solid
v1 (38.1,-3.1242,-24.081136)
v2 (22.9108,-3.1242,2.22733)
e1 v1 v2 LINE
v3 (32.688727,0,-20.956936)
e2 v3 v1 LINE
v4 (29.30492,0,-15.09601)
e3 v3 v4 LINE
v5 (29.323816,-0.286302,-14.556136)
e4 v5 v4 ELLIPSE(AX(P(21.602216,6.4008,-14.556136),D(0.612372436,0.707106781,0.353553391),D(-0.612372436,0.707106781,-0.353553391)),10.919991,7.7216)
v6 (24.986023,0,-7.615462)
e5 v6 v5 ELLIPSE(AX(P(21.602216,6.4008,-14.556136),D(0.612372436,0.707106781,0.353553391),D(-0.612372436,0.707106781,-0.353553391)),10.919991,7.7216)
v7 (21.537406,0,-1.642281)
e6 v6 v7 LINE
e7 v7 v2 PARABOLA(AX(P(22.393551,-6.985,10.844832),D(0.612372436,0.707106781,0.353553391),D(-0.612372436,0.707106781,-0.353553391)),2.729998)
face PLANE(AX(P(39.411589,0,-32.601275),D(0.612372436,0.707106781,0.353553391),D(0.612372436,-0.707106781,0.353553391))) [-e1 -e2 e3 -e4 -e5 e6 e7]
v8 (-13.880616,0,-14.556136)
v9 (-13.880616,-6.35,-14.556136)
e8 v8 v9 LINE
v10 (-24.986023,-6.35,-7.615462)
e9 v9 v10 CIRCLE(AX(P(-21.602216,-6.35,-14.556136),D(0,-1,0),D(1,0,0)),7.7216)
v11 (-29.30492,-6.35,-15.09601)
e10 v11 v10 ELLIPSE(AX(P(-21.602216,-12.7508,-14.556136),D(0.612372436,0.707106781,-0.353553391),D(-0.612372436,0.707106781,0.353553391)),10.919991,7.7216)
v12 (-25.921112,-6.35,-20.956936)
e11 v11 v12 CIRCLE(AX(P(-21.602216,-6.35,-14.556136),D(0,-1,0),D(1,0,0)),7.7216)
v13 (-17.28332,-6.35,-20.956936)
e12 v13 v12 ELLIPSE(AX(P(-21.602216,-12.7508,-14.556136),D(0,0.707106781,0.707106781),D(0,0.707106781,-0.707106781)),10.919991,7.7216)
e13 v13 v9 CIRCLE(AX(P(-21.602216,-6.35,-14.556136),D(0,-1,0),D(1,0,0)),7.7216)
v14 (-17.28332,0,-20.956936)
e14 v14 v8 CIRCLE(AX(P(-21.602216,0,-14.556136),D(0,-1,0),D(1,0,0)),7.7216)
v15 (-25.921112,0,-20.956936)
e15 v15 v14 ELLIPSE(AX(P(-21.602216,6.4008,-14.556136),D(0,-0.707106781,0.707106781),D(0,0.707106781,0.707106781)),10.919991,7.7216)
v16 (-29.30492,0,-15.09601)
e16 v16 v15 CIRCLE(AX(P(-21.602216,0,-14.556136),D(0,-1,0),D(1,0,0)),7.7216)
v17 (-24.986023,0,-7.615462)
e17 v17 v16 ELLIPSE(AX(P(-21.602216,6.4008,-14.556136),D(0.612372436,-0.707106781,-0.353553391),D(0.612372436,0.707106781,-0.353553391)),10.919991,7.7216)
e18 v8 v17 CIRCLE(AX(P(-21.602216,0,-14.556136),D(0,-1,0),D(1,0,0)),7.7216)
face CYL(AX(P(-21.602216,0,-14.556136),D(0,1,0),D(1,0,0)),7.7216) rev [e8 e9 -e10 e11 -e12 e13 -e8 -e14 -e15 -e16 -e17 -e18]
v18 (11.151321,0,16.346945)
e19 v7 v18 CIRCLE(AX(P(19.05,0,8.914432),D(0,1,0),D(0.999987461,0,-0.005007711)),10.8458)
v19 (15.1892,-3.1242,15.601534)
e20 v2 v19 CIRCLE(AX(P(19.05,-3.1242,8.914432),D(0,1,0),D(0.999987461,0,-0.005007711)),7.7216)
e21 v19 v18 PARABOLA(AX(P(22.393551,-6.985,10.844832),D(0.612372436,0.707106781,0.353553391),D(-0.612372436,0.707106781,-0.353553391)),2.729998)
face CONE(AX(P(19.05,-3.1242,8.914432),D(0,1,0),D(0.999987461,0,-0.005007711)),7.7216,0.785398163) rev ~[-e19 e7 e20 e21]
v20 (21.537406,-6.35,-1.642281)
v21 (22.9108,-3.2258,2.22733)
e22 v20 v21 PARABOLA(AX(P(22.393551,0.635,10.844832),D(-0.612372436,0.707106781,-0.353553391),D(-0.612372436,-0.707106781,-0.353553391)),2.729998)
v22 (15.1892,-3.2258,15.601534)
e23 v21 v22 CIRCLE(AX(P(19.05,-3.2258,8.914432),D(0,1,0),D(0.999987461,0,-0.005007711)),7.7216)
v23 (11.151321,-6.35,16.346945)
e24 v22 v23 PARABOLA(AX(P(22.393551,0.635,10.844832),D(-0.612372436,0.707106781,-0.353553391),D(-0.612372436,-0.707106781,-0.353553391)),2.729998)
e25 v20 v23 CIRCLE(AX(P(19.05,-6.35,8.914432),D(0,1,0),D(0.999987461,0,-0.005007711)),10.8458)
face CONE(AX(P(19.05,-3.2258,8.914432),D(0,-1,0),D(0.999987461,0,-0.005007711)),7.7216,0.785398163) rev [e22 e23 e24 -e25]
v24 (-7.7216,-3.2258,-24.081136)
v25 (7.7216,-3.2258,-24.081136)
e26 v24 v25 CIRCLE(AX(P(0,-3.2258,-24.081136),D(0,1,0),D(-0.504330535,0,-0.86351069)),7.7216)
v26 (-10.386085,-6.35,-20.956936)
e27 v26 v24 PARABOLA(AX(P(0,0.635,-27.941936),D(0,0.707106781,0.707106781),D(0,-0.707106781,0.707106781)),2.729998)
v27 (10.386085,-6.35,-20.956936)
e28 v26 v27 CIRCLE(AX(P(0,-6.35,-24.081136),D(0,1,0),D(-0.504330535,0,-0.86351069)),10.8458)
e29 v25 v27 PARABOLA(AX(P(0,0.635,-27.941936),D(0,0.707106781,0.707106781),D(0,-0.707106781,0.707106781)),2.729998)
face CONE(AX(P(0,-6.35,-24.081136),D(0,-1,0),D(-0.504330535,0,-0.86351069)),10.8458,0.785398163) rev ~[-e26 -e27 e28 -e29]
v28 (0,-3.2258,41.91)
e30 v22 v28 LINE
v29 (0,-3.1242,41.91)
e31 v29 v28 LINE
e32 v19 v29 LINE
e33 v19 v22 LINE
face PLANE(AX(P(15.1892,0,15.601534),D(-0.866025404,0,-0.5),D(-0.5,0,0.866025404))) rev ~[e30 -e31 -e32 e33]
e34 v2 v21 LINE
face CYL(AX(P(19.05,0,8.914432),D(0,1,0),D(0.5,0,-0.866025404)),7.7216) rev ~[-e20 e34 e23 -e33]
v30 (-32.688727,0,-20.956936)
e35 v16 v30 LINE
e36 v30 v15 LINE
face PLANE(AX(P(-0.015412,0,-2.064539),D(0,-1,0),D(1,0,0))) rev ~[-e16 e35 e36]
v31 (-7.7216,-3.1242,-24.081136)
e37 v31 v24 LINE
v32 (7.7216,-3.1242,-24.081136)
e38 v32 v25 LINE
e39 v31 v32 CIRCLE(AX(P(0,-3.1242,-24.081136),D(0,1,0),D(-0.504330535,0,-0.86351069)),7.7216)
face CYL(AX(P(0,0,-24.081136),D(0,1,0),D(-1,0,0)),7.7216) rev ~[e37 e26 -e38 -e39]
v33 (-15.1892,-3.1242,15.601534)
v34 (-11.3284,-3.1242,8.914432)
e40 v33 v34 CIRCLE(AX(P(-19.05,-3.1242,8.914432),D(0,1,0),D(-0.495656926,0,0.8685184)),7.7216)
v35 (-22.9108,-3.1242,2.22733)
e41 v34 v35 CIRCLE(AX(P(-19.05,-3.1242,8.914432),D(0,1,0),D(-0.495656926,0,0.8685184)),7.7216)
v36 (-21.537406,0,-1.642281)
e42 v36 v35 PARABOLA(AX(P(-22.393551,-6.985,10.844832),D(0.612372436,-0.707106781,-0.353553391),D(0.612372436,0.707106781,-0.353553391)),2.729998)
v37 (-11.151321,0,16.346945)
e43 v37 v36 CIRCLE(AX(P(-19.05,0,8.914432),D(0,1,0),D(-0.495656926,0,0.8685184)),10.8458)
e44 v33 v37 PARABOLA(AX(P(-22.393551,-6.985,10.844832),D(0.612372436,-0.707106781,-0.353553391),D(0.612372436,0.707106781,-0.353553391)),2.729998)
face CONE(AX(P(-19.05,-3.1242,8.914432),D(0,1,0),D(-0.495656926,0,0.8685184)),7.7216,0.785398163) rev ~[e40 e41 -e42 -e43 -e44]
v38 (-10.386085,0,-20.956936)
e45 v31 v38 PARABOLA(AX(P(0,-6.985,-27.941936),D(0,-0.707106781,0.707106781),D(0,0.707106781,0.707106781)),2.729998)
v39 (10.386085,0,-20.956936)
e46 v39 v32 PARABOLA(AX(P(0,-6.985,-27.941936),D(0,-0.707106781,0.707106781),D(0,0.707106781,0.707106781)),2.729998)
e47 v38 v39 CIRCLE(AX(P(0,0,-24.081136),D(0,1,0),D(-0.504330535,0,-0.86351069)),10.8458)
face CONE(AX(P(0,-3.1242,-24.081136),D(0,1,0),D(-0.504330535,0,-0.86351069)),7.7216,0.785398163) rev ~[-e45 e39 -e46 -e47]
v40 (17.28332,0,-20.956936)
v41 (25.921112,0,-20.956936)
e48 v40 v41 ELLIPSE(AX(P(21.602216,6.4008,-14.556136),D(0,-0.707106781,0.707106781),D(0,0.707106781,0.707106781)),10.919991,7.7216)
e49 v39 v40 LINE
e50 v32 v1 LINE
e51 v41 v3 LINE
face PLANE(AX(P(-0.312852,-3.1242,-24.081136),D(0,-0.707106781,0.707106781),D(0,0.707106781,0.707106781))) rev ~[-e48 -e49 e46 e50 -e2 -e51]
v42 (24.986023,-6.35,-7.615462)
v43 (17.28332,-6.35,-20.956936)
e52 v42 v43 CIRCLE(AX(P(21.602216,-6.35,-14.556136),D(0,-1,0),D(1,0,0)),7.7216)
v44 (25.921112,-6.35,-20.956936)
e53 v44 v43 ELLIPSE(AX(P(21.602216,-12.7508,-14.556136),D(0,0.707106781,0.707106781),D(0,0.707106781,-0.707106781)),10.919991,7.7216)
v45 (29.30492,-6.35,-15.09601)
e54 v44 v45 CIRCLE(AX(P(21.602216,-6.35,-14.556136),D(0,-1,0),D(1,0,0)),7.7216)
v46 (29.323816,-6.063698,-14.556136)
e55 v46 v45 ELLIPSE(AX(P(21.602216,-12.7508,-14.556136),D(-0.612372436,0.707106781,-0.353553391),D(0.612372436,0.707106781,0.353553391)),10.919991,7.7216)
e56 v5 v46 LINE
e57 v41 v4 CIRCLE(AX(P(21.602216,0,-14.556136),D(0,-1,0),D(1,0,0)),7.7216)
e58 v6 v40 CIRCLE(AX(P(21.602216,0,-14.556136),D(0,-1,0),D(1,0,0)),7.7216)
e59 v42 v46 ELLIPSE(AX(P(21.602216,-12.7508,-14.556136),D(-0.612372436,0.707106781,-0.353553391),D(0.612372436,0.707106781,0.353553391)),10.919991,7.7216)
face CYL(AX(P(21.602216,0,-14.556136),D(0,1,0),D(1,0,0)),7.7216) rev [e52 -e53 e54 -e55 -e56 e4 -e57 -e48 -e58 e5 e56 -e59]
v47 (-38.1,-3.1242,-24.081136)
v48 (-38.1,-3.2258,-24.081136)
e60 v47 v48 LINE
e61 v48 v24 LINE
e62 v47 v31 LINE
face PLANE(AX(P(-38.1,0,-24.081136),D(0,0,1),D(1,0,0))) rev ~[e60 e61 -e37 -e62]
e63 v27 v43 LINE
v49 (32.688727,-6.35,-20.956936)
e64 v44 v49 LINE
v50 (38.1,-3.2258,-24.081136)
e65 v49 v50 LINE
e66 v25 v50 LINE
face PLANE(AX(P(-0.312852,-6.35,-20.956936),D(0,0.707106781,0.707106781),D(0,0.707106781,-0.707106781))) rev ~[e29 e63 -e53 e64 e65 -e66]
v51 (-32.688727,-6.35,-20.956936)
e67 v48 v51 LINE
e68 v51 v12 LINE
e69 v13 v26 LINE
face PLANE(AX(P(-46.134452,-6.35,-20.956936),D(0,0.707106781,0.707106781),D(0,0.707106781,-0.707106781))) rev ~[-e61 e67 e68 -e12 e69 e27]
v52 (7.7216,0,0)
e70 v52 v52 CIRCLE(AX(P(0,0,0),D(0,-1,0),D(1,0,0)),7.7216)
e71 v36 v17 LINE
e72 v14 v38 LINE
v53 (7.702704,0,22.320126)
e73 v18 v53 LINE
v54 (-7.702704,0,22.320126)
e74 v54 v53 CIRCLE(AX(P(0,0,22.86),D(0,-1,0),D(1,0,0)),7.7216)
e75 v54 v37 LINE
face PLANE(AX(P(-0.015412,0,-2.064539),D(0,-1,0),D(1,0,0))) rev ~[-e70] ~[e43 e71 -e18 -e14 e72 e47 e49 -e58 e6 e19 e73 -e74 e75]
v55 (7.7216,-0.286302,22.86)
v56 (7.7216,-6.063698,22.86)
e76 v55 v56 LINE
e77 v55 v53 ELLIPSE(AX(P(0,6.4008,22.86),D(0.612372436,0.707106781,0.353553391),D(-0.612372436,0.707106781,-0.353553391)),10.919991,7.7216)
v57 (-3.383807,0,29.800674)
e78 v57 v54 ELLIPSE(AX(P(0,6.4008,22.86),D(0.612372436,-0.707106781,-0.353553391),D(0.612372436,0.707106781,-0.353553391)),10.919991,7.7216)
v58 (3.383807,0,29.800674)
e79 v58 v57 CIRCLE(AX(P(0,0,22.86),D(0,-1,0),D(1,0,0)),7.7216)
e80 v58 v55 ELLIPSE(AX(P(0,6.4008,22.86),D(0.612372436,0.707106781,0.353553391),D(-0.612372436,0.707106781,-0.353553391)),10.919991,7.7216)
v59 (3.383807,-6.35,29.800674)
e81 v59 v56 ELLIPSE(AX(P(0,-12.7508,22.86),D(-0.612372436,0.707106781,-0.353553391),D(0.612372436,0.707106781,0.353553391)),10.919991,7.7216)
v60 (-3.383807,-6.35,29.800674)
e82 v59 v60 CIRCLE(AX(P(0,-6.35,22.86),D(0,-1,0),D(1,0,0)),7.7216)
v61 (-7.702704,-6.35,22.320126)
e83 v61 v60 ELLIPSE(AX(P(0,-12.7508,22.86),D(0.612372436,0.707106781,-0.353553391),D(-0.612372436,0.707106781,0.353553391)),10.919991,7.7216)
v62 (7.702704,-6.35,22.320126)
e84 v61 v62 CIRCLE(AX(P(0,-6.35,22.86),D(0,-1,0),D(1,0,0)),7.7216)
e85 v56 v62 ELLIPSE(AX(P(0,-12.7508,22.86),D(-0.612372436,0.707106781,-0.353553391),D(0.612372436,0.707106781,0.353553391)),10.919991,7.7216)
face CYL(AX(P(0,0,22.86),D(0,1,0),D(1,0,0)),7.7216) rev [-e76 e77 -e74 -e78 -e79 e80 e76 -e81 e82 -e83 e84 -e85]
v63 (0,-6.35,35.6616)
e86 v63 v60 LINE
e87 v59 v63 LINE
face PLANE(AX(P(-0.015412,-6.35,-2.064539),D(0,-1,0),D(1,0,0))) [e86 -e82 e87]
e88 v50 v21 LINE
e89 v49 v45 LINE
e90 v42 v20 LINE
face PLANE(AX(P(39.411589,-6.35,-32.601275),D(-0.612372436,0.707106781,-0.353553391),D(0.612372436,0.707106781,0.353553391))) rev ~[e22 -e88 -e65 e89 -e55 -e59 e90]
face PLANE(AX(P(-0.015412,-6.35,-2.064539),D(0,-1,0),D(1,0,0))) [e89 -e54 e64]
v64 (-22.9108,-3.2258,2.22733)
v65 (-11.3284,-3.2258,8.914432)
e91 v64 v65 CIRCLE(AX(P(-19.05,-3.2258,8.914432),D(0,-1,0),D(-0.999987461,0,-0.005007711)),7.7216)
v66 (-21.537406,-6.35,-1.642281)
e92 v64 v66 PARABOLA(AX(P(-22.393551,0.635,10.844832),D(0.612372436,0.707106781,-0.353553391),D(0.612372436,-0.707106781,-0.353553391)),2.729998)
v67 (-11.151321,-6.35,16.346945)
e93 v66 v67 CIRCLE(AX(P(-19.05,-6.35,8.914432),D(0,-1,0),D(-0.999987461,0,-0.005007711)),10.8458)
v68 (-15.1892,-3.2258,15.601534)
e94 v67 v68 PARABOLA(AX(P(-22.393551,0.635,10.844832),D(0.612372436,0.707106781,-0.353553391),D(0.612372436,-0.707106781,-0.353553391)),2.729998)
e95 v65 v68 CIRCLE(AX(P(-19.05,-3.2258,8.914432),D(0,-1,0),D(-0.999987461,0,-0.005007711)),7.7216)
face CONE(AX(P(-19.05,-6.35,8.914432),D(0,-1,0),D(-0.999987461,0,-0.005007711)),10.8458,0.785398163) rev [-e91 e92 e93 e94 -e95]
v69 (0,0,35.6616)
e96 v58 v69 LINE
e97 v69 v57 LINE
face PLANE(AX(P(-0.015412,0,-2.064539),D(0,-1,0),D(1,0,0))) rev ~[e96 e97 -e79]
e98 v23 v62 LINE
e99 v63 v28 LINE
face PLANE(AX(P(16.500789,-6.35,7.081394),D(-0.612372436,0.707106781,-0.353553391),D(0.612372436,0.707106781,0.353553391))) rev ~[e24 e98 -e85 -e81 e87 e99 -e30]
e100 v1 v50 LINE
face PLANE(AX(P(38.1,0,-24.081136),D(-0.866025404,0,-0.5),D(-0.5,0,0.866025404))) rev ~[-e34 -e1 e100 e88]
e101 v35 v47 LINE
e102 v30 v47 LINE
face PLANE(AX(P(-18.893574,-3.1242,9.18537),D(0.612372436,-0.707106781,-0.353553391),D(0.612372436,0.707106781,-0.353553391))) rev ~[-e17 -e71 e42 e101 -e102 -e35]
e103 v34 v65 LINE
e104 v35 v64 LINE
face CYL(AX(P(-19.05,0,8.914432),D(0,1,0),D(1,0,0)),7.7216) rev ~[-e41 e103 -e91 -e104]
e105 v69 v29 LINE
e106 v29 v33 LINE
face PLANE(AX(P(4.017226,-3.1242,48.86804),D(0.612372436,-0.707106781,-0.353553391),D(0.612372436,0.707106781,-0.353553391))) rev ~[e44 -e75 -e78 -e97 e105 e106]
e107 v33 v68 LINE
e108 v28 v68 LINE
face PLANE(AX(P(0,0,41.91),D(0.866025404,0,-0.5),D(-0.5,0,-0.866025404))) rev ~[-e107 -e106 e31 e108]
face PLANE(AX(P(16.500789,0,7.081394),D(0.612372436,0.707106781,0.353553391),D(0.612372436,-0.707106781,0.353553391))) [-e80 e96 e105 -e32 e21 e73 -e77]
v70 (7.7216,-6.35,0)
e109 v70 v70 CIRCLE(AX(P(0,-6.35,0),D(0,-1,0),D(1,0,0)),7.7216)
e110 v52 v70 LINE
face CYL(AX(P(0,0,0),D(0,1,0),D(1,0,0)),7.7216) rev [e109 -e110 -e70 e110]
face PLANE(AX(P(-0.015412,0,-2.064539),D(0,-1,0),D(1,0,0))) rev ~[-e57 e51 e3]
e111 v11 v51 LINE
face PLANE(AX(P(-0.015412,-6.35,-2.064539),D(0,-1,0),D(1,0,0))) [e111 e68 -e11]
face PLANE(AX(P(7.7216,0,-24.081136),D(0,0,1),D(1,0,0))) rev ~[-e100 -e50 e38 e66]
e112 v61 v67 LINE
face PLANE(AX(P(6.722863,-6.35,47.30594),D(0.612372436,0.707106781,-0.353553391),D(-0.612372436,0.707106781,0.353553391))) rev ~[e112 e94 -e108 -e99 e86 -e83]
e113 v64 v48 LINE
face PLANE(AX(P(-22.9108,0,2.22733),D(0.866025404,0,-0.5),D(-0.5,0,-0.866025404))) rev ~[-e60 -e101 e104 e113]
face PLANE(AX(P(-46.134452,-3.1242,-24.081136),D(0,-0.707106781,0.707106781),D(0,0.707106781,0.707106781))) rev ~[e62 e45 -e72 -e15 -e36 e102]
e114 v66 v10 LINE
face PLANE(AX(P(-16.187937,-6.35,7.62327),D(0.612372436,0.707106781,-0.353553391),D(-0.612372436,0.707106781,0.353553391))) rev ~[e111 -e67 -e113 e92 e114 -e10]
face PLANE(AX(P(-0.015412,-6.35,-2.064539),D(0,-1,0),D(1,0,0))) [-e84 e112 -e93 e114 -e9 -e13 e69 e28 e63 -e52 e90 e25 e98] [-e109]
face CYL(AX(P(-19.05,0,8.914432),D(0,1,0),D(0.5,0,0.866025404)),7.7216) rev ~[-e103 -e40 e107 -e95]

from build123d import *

# Parameters (mm, degrees)
F0_R         = 7.7216
F1_DEPTH     = 6.35
F2_T1_DEPTH  = 46.447303982
F2_T3_DEPTH  = 46.447303982
F2_T5_DEPTH  = 46.447303982
F2_T7_DEPTH  = 46.447303982
F2_T9_DEPTH  = 46.447303982
F2_T11_DEPTH = 46.447303982
F2_T14_ANGLE = 299.426156199
F2_T16_ANGLE = 299.426156199
F2_T18_ANGLE = 299.426156199
F2_T20_ANGLE = 299.426156199
F2_T22_ANGLE = 299.426156199
F2_T24_ANGLE = 299.426156199


# Not quite as in the source:
# - a fillet or chamfer that OpenCascade refuses, or shapes differently, is made with other operations: its cross-section is extruded or revolved along the edge and cut away or added


with BuildPart() as f1:
    # F0 (on Front) → F1 (new body)
    with BuildSketch(Plane.XZ):
        with BuildLine():
            Line((-22.9108, 2.227330358), (-38.1, -24.0811357684))
            Line((-38.1, -24.0811357684), (-7.7216, -24.0811357684))
            ThreePointArc((-7.7216, -24.0811357684), (0, -16.3595357684), (7.7216, -24.0811357684))
            Line((7.7216, -24.0811357684), (38.1, -24.0811357684))
            Line((38.1, -24.0811357684), (22.9108, 2.227330358))
            ThreePointArc((22.9108, 2.227330358), (12.3628982421, 5.0536321158), (15.1892, 15.6015338737))
            Line((15.1892, 15.6015338737), (0, 41.91))
            Line((0, 41.91), (-15.1892, 15.6015338737))
            ThreePointArc((-15.1892, 15.6015338737), (-12.3628982421, 12.7752321158), (-11.3284, 8.9144321158))
            ThreePointArc((-11.3284, 8.9144321158), (-15.1892, 2.227330358), (-22.9108, 2.227330358))
        make_face()
        with Locations((-21.6022160579, -14.5561357684)):
            Circle(F0_R, mode=Mode.SUBTRACT)
        with Locations((21.6022160579, -14.5561357684)):
            Circle(F0_R, mode=Mode.SUBTRACT)
        Circle(F0_R, mode=Mode.SUBTRACT)
        with Locations((0, 22.86)):
            Circle(F0_R, mode=Mode.SUBTRACT)
    extrude(amount=F1_DEPTH)

    # F2: chamfer of 3.1242 on 18 edges, made by hand

    # F2_s2 → F2_t1 (cut)
    with BuildSketch(Plane(origin=(-0.7460116682, 0, -1.2921301124), x_dir=(0, 1, 0), z_dir=(-0.5, 0, -0.8660254038))):
        Polygon((-6.35, -17.8308), (-3.2258, -20.955), (-6.35, -20.955), align=None)
        Polygon((-3.1242, -20.955), (0, -17.8308), (0, -20.955), align=None)
    extrude(amount=F2_T1_DEPTH, mode=Mode.SUBTRACT)

    # F2_s4 → F2_t3 (cut)
    with BuildSketch(Plane(origin=(22.1647883318, 0, 38.3905395297), x_dir=(0, 1, 0), z_dir=(-0.5, 0, -0.8660254038))):
        Polygon((-6.35, -17.8308), (-3.2258, -20.955), (-6.35, -20.955), align=None)
        Polygon((-3.1242, -20.955), (0, -17.8308), (0, -20.955), align=None)
    extrude(amount=F2_T3_DEPTH, mode=Mode.SUBTRACT)

    # F2_s6 → F2_t5 (cut)
    with BuildSketch(Plane(origin=(1.0588636592, 0, -1.834005656), x_dir=(0, 1, 0), z_dir=(-0.5, 0, 0.8660254038))):
        Polygon((-6.35, -17.8308), (-3.2258, -20.955), (-6.35, -20.955), align=None)
        Polygon((0, -17.8308), (-3.1242, -20.955), (0, -20.955), align=None)
    extrude(amount=F2_T5_DEPTH, mode=Mode.SUBTRACT)

    # F2_s8 → F2_t7 (cut)
    with BuildSketch(Plane(origin=(23.9696636592, 0, -41.5166752981), x_dir=(0, 1, 0), z_dir=(-0.5, 0, 0.8660254038))):
        Polygon((-6.35, -17.8308), (-3.2258, -20.955), (-6.35, -20.955), align=None)
        Polygon((0, -17.8308), (-3.1242, -20.955), (0, -20.955), align=None)
    extrude(amount=F2_T7_DEPTH, mode=Mode.SUBTRACT)

    # F2_s10 → F2_t9 (cut)
    with BuildSketch(Plane.YZ.offset(-0.312851991)):
        Polygon((-6.35, -20.9569357684), (-3.2258, -24.0811357684), (-6.35, -24.0811357684), align=None)
        Polygon((-3.1242, -24.0811357684), (0, -20.9569357684), (0, -24.0811357684), align=None)
    extrude(amount=F2_T9_DEPTH, mode=Mode.SUBTRACT)

    # F2_s12 → F2_t11 (cut)
    with BuildSketch(Plane.YZ.offset(-46.134451991)):
        Polygon((-6.35, -20.9569357684), (-3.2258, -24.0811357684), (-6.35, -24.0811357684), align=None)
        Polygon((-3.1242, -24.0811357684), (0, -20.9569357684), (0, -24.0811357684), align=None)
    extrude(amount=F2_T11_DEPTH, mode=Mode.SUBTRACT)

    # F2_s13 → F2_t14 (revolve, cut)
    with BuildSketch(Plane(origin=(-0.0451180595, 0, 9.0096042642), x_dir=(0, 1, 0), z_dir=(-0.0050077109, 0, 0.9999874613))):
        Polygon((-6.35, 29.8509202393), (-3.2258, 26.7267202393), (-6.35, 26.7267202393), align=None)
    revolve(axis=Axis((-19.05, -6.35, 8.9144321158), (0, -1, 0)), revolution_arc=F2_T14_ANGLE, mode=Mode.SUBTRACT)

    # F2_s15 → F2_t16 (revolve, cut)
    with BuildSketch(Plane(origin=(0.0451180595, 0, 9.0096042642), x_dir=(0, 1, 0), z_dir=(0.0050077109, 0, 0.9999874613))):
        Polygon((-3.2258, -26.7267202393), (-6.35, -29.8509202393), (-6.35, -26.7267202393), align=None)
    revolve(axis=Axis((19.05, -6.35, 8.9144321158), (0, 1, 0)), revolution_arc=F2_T16_ANGLE, mode=Mode.SUBTRACT)

    # F2_s17 → F2_t18 (revolve, cut)
    with BuildSketch(Plane(origin=(10.4872096098, 0, -6.1250197631), x_dir=(0, 1, 0), z_dir=(0.8635106895, 0, -0.5043305355))):
        Polygon((-6.35, -31.6401181517), (-3.2258, -28.5159181517), (-6.35, -28.5159181517), align=None)
    revolve(axis=Axis((0, -6.35, -24.0811357684), (0, 1, 0)), revolution_arc=F2_T18_ANGLE, mode=Mode.SUBTRACT)

    # F2_s19 → F2_t20 (revolve, cut)
    with BuildSketch(Plane(origin=(10.4872096098, 0, -6.1250197631), x_dir=(0, 1, 0), z_dir=(0.8635106895, 0, -0.5043305355))):
        Polygon((-3.1242, -28.5159181517), (0, -31.6401181517), (0, -28.5159181517), align=None)
    revolve(axis=Axis((0, 0, -24.0811357684), (0, 1, 0)), revolution_arc=F2_T20_ANGLE, mode=Mode.SUBTRACT)

    # F2_s21 → F2_t22 (revolve, cut)
    with BuildSketch(Plane(origin=(0.0451180595, 0, 9.0096042642), x_dir=(0, 1, 0), z_dir=(0.0050077109, 0, 0.9999874613))):
        Polygon((-3.1242, -26.7267202393), (0, -29.8509202393), (0, -26.7267202393), align=None)
    revolve(axis=Axis((19.05, 0, 8.9144321158), (0, 1, 0)), revolution_arc=F2_T22_ANGLE, mode=Mode.SUBTRACT)

    # F2_s23 → F2_t24 (revolve, cut)
    with BuildSketch(Plane(origin=(-10.5323276693, 0, -6.0107202694), x_dir=(0, 1, 0), z_dir=(-0.8685184004, 0, -0.4956569258))):
        Polygon((-3.1242, -24.9062127584), (0, -28.0304127584), (0, -24.9062127584), align=None)
    revolve(axis=Axis((-19.05, 0, 8.9144321158), (0, 1, 0)), revolution_arc=F2_T24_ANGLE, mode=Mode.SUBTRACT)


solid = f1.part
